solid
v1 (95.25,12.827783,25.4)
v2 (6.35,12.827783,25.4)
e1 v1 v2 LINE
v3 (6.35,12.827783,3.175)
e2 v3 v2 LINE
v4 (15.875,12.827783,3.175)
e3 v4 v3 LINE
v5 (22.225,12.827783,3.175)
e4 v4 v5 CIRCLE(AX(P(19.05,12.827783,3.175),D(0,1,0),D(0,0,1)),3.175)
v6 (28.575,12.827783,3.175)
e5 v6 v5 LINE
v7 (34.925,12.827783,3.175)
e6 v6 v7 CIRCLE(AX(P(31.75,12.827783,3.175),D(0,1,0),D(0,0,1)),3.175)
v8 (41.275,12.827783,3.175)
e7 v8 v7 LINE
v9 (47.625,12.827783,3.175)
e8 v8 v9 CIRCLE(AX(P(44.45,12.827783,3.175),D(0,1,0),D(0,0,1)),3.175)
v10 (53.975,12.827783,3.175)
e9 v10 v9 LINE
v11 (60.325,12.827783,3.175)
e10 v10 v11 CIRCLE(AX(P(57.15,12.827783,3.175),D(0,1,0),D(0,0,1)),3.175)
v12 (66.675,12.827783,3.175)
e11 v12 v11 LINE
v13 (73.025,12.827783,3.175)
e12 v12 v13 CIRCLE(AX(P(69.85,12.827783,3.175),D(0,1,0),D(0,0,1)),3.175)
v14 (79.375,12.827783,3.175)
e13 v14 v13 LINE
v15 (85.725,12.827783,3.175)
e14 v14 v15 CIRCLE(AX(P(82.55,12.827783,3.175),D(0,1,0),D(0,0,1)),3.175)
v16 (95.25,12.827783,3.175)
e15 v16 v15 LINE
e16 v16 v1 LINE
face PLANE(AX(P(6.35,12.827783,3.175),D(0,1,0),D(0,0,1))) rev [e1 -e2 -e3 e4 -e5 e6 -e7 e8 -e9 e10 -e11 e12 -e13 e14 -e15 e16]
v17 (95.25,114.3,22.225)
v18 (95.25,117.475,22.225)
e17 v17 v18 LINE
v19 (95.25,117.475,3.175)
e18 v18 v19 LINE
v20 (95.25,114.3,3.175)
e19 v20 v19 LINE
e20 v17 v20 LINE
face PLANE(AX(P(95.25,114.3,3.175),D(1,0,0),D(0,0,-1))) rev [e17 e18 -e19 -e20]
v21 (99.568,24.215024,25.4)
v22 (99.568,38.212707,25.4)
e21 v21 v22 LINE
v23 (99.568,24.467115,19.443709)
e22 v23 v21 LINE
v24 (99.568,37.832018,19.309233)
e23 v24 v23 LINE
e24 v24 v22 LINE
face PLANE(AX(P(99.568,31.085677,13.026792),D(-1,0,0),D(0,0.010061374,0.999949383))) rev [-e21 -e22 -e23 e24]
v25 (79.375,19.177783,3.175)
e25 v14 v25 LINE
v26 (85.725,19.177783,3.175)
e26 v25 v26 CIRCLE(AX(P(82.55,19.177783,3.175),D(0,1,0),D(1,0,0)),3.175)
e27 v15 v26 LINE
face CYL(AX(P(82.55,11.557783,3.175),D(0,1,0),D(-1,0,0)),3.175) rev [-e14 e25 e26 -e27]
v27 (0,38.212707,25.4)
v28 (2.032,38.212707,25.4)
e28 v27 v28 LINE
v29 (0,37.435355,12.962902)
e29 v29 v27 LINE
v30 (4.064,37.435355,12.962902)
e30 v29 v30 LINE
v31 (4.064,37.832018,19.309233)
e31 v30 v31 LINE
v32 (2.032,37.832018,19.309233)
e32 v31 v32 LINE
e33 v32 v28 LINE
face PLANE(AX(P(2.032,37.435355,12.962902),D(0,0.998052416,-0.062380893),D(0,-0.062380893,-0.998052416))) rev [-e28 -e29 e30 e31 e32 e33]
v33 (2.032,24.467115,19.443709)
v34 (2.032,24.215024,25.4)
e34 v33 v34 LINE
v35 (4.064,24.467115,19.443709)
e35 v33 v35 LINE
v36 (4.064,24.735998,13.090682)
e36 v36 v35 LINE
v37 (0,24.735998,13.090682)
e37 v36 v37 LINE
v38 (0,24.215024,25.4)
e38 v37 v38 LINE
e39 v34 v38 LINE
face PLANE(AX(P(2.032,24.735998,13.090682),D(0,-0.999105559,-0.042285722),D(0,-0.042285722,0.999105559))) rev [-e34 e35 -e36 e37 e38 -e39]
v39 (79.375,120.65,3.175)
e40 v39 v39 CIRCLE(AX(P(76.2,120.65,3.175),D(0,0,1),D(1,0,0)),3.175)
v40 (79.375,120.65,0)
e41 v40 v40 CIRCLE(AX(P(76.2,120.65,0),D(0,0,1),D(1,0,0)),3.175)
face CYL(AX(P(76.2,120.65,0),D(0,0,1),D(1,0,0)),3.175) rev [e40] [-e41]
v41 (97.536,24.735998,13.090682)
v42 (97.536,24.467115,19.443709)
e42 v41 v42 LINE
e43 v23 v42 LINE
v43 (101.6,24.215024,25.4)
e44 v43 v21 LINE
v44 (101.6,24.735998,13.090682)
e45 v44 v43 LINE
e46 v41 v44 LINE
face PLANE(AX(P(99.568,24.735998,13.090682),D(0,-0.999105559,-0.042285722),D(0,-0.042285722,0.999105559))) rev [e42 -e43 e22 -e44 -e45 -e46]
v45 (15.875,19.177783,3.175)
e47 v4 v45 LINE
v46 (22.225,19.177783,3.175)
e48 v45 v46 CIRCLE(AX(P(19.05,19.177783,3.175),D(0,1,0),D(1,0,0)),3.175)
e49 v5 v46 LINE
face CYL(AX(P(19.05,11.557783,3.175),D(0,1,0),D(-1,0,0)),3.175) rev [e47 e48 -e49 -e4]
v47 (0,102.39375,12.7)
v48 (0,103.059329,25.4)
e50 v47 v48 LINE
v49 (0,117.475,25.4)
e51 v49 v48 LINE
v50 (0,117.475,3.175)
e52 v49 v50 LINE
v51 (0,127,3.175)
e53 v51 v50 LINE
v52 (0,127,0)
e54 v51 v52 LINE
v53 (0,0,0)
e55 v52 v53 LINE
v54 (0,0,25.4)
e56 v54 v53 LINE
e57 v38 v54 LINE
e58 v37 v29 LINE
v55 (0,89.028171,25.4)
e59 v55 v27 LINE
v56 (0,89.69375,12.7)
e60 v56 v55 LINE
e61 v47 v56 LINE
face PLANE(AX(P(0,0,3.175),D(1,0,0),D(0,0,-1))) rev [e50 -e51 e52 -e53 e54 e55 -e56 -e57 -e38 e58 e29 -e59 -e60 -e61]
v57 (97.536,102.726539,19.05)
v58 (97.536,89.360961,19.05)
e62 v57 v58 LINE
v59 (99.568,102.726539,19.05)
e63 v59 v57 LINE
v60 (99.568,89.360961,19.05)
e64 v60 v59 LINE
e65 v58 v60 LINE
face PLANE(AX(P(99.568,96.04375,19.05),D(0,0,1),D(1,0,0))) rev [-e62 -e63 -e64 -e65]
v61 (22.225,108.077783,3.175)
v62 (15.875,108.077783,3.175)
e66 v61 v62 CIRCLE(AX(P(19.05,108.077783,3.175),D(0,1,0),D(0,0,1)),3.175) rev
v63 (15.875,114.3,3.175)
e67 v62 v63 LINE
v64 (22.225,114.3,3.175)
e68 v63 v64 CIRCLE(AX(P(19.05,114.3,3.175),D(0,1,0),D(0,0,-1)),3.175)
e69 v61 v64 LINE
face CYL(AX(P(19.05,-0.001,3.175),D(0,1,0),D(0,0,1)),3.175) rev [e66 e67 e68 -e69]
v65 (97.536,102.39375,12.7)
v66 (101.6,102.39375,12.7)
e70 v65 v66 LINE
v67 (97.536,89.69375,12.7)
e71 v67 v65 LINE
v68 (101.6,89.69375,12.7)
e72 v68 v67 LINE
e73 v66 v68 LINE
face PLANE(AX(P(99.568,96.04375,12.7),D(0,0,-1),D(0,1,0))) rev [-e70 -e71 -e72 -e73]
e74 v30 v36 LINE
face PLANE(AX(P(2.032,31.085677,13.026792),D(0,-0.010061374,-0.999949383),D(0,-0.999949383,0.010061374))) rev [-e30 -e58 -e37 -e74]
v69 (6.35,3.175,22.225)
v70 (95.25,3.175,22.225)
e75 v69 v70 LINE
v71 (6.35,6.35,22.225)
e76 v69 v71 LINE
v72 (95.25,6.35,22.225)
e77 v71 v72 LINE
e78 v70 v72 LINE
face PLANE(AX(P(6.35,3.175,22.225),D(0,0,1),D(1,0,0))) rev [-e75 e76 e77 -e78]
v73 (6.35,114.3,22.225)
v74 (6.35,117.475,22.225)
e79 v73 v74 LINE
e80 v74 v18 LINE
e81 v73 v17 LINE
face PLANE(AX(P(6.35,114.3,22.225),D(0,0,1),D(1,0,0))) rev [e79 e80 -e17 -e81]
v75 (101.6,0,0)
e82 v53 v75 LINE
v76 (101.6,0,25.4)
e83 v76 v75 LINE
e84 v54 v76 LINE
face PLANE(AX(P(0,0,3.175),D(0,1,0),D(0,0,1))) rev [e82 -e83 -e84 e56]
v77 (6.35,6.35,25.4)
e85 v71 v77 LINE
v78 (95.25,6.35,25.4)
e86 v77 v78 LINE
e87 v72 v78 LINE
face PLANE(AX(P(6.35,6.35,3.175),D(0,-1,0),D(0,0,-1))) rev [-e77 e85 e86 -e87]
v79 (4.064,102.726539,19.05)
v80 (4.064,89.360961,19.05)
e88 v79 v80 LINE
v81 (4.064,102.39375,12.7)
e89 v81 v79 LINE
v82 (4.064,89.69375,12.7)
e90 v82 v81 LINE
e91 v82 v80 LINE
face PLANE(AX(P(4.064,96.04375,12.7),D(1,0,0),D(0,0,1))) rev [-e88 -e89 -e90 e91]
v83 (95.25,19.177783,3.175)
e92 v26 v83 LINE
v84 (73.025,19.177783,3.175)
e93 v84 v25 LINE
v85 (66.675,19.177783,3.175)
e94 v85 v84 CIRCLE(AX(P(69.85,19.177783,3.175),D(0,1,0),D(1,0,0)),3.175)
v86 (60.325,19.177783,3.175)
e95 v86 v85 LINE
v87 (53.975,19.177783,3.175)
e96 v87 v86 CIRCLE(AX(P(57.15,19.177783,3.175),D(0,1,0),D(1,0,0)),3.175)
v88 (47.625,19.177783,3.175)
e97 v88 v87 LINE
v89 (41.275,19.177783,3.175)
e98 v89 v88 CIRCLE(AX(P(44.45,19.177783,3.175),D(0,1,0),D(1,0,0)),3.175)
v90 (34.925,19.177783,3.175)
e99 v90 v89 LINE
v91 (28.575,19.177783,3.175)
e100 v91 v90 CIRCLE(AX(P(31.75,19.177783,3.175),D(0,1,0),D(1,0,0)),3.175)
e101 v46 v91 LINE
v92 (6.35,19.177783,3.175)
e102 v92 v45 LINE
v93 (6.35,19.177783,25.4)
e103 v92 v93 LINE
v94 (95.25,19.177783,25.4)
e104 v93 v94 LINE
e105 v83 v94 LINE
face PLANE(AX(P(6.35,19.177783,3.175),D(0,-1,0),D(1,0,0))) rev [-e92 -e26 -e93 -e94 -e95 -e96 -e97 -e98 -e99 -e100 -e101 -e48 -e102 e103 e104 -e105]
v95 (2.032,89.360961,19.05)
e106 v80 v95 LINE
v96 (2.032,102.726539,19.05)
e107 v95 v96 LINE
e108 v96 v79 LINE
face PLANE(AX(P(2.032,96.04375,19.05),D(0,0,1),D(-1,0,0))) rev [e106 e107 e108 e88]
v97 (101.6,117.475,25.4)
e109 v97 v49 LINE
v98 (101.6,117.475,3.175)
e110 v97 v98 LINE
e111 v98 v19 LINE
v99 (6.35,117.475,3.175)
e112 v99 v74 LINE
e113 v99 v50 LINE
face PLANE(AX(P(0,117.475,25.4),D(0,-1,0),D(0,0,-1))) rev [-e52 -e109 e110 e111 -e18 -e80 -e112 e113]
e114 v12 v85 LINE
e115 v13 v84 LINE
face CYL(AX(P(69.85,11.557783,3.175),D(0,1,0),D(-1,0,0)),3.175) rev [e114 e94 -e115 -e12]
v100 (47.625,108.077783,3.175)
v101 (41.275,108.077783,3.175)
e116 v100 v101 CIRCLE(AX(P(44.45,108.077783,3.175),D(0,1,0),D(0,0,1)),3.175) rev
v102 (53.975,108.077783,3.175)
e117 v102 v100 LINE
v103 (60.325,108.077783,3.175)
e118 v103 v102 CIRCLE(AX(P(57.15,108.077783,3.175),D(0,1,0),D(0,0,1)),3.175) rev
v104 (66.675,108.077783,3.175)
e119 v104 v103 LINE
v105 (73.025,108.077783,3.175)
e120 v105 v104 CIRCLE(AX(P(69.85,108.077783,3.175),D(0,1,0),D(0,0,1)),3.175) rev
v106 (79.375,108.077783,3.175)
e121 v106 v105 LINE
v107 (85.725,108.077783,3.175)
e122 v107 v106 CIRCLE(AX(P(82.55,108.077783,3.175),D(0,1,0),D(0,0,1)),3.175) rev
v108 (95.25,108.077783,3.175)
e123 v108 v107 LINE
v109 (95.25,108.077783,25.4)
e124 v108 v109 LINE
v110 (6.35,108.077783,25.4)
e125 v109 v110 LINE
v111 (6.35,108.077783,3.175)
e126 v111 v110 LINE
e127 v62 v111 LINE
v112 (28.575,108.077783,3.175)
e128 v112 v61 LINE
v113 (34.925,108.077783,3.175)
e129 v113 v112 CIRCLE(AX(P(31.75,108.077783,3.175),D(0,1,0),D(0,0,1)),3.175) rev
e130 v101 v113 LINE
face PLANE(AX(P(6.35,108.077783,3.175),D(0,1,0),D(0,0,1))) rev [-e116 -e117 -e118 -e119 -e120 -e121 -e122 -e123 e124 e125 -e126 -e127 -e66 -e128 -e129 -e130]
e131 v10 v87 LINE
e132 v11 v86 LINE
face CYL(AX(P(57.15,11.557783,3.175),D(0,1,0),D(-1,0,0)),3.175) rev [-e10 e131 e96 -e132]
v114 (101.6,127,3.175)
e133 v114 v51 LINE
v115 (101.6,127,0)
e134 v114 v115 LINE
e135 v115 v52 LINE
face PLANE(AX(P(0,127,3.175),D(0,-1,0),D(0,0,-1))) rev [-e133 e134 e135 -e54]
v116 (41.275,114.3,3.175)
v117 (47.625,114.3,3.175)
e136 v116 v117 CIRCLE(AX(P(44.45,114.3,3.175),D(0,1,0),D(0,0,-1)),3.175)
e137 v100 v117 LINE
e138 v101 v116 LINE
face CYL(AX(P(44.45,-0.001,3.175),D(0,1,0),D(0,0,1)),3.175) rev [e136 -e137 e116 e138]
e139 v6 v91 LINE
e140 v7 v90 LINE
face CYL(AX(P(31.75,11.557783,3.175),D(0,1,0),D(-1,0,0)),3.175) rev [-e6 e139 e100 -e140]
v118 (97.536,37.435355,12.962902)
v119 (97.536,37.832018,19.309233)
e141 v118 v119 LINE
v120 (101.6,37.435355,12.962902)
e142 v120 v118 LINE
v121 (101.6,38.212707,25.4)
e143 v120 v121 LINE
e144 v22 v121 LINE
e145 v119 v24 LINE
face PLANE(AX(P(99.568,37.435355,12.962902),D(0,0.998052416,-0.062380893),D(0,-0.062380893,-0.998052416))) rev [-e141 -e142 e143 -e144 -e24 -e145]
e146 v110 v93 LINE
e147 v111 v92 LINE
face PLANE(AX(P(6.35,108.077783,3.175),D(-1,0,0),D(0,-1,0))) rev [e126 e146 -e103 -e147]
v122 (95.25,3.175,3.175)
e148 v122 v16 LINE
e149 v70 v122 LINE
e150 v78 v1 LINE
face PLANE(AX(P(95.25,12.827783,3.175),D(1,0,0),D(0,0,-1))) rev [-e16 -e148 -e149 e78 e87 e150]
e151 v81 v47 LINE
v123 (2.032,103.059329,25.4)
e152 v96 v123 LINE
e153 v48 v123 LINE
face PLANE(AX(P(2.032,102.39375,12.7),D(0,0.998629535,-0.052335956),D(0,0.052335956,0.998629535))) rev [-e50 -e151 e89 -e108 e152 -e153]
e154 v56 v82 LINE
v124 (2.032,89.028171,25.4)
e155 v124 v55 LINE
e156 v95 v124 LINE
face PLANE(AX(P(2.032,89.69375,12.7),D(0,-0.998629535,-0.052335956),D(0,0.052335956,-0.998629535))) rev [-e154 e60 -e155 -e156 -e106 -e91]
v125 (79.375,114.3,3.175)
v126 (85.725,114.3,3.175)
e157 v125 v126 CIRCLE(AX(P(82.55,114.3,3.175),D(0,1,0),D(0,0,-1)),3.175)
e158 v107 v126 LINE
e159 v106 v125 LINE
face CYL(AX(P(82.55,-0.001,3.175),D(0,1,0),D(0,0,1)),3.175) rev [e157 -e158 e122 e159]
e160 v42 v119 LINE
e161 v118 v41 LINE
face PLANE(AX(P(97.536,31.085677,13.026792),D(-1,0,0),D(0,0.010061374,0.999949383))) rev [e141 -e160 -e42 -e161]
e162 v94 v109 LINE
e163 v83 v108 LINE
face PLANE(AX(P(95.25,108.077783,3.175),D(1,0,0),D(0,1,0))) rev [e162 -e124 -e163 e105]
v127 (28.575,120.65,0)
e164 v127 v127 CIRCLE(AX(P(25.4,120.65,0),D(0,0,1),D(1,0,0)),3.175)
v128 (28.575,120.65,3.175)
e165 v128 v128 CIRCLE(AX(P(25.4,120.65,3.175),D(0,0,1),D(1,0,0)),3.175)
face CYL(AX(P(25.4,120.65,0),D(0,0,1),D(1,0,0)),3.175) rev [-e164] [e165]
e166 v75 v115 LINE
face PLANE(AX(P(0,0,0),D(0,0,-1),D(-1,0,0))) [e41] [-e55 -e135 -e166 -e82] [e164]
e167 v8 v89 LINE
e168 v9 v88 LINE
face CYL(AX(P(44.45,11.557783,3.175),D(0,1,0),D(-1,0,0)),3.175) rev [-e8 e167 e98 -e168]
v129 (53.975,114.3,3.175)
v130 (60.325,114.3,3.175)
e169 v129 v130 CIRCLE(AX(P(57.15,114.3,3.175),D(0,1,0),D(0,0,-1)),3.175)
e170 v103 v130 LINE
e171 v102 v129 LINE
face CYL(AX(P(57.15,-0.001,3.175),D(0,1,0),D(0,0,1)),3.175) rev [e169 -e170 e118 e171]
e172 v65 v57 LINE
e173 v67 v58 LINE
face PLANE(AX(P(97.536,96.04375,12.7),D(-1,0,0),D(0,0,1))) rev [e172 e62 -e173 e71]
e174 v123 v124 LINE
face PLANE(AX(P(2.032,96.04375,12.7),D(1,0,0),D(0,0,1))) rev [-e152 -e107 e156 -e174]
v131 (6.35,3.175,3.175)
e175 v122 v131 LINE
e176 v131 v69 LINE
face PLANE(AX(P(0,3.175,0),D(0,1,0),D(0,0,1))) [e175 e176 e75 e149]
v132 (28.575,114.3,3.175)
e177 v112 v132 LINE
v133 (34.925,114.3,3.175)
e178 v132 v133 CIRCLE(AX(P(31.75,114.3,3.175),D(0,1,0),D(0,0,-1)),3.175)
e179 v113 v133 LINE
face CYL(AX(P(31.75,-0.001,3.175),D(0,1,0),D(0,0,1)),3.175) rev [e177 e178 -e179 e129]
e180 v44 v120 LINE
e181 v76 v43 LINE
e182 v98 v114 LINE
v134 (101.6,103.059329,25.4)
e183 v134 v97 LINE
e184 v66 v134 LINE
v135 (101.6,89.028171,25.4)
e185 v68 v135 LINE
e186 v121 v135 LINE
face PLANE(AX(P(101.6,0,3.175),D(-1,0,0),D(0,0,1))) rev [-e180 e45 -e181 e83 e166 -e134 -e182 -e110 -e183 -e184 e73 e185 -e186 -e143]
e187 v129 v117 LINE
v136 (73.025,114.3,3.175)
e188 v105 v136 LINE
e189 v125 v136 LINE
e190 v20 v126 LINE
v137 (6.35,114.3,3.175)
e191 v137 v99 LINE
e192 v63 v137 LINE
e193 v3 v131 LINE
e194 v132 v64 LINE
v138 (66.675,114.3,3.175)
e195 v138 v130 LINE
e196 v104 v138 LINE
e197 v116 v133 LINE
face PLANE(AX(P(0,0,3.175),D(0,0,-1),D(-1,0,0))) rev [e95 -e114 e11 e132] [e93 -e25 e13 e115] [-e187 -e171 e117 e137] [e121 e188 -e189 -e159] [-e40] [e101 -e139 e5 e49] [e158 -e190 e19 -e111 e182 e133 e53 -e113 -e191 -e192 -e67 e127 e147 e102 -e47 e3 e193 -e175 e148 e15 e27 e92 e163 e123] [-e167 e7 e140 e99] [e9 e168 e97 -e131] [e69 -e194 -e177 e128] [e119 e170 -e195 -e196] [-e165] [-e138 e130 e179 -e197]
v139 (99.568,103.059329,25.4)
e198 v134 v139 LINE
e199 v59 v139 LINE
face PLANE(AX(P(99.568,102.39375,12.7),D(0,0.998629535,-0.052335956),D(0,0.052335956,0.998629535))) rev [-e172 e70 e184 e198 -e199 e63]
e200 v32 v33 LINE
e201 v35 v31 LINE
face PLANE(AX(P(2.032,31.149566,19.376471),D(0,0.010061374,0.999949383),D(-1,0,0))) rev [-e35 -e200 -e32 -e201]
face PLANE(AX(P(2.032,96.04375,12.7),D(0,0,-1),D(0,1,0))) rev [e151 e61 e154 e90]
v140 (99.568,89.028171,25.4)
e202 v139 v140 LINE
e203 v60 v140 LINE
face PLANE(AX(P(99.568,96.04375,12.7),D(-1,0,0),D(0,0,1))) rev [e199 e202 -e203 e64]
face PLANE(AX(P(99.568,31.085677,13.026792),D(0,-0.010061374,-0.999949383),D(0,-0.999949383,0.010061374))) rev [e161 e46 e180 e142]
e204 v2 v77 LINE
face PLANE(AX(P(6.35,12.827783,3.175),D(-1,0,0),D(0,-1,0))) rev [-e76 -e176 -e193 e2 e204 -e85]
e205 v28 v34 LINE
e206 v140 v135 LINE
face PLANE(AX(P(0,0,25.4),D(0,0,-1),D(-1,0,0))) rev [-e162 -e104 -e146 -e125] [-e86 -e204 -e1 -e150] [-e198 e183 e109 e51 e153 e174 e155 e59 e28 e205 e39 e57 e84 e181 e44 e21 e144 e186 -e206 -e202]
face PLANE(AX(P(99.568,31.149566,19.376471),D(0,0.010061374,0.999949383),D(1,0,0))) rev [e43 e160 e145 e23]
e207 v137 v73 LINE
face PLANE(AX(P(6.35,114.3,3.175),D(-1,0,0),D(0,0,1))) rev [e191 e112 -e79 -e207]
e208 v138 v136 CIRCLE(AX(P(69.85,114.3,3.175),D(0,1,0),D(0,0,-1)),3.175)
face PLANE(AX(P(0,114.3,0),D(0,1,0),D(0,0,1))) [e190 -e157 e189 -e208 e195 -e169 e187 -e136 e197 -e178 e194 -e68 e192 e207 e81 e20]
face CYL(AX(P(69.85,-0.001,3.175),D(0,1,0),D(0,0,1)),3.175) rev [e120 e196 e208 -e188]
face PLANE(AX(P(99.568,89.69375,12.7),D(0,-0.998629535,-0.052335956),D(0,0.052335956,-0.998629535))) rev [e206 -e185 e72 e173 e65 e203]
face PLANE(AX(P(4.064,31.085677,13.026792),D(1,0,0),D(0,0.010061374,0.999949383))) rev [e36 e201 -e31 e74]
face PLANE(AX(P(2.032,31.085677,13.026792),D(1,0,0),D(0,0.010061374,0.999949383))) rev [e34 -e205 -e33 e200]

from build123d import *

# Parameters (mm, degrees)
SKETCH1_W            = 101.6
SKETCH1_H            = 127
BOSS_EXTRUDE1_DEPTH  = 3.175
SKETCH2_W            = 101.6
SKETCH2_H            = 117.475
BOSS_EXTRUDE2_DEPTH  = 22.225
SKETCH3_W            = 88.9
SKETCH3_H            = 19.05
CUT_EXTRUDE1_DEPTH   = 3.175
SKETCH4_R            = 3.175
CUT_EXTRUDE2_DEPTH   = 165.150877625
SKETCH5_W            = 88.9
SKETCH5_H            = 6.477782688
CUT_EXTRUDE3_DEPTH   = 22.225
SKETCH6_W            = 88.9
SKETCH6_H            = 19.05
CUT_EXTRUDE4_DEPTH   = 3.175
SKETCH7_W            = 88.9
SKETCH7_H            = 88.9
CUT_EXTRUDE6_DEPTH   = 22.225
CUT_EXTRUDE7_DEPTH   = 7.62
LPATTERN1_COUNT      = 6
LPATTERN1_PITCH      = 12.7
SNAP_START           = 99.568
SNAP_GROOVE1_DEPTH   = 2.032
SNAP_START_2         = 97.536
SNAP_GROOVE1_2_DEPTH = 2.032
MIRROR2_START        = 99.568
MIRROR2_COPY_1_DEPTH = 2.032
MIRROR2_START_2      = 97.536
MIRROR2_COPY_2_DEPTH = 2.032
MIRROR2_COPY_3_DEPTH = 2.032
CUT_EXTRUDE8_REACH   = 157.023
LPATTERN2_COUNT      = 6
LPATTERN2_PITCH      = 12.7


# Read off the part's stored shape, not the designer's step: Snap Groove1
with BuildPart() as part:
    # Sketch1 → Boss-Extrude1 (new body)
    with BuildSketch(Plane.XY):
        with Locations((50.8, 63.5)):
            Rectangle(SKETCH1_W, SKETCH1_H)
    extrude(amount=BOSS_EXTRUDE1_DEPTH)

    # Sketch2 → Boss-Extrude2 (add)
    with BuildSketch(Plane.XY.offset(3.175)):
        with Locations((50.8, 58.7375)):
            Rectangle(SKETCH2_W, SKETCH2_H)
    extrude(amount=BOSS_EXTRUDE2_DEPTH)

    # Sketch3 → Cut-Extrude1 (cut)
    with BuildSketch(Plane(origin=(0, 117.475, 0), x_dir=(1, 0, 0), z_dir=(0, 1, 0))):
        with Locations((50.8, -12.7)):
            Rectangle(SKETCH3_W, SKETCH3_H)
    extrude(amount=-CUT_EXTRUDE1_DEPTH, mode=Mode.SUBTRACT)

    # Sketch4 → Cut-Extrude2 (cut, through all)
    with BuildSketch(Plane.XY.offset(3.175)):
        with Locations((25.4, 120.65)):
            Circle(SKETCH4_R)
        with Locations((76.2, 120.65)):
            Circle(SKETCH4_R)
    extrude(amount=-CUT_EXTRUDE2_DEPTH, mode=Mode.SUBTRACT)

    # Sketch5 → Cut-Extrude3 (cut)
    with BuildSketch(Plane.XY.offset(25.4)):
        with Locations((50.8, 9.588891344)):
            Rectangle(SKETCH5_W, SKETCH5_H)
    extrude(amount=-CUT_EXTRUDE3_DEPTH, mode=Mode.SUBTRACT)

    # Sketch6 → Cut-Extrude4 (cut)
    with BuildSketch(Plane(origin=(0, 6.35, 0), x_dir=(1, 0, 0), z_dir=(0, 1, 0))):
        with Locations((50.8, -12.7)):
            Rectangle(SKETCH6_W, SKETCH6_H)
    extrude(amount=-CUT_EXTRUDE4_DEPTH, mode=Mode.SUBTRACT)

    # Sketch7 → Cut-Extrude6 (cut)
    with BuildSketch(Plane.XY.offset(25.4)):
        with Locations((50.8, 63.627782688)):
            Rectangle(SKETCH7_W, SKETCH7_H)
    extrude(amount=-CUT_EXTRUDE6_DEPTH, mode=Mode.SUBTRACT)

    # Sketch9 → Cut-Extrude7 (cut)
    with BuildSketch(Plane(origin=(0, 19.177782688, 0), x_dir=(1, 0, 0), z_dir=(0, 1, 0))):
        with BuildLine():
            Line((15.875, -3.175), (22.225, -3.175))
            ThreePointArc((22.225, -3.175), (19.05, -6.35), (15.875, -3.175))
        make_face()
    cut_extrude7 = extrude(amount=-CUT_EXTRUDE7_DEPTH, mode=Mode.SUBTRACT)

    # LPattern1: Cut-Extrude7 ×6
    with Locations(*[(i * LPATTERN1_PITCH, 0, 0) for i in range(1, LPATTERN1_COUNT)]):
        add(cut_extrude7, mode=Mode.SUBTRACT)

    # Snap Groove1 outline → Snap Groove1 (cut)
    with BuildSketch(Plane.YZ.offset(SNAP_START)):
        Polygon((102.39375, 12.7), (103.059328797, 25.4), (89.028171203, 25.4), (89.69375, 12.7), align=None)
    snap_groove1 = extrude(amount=SNAP_GROOVE1_DEPTH, mode=Mode.SUBTRACT)

    # Snap Groove1 2 outline → Snap Groove1 2 (cut)
    with BuildSketch(Plane.YZ.offset(SNAP_START_2)):
        Polygon((102.39375, 12.7), (102.726539398, 19.05), (89.360960602, 19.05), (89.69375, 12.7), align=None)
    snap_groove1_2 = extrude(amount=SNAP_GROOVE1_2_DEPTH, mode=Mode.SUBTRACT)

    # Mirror1: Snap Groove1, Snap Groove1 2 across plane
    add(snap_groove1.mirror(Plane(origin=(50.8, 0, 0), x_dir=(0, 0, 1), z_dir=(1, 0, 0))), mode=Mode.SUBTRACT)
    add(snap_groove1_2.mirror(Plane(origin=(50.8, 0, 0), x_dir=(0, 0, 1), z_dir=(1, 0, 0))), mode=Mode.SUBTRACT)

    # Mirror2: Snap Groove1, Snap Groove1 2 across plane
    add(snap_groove1.mirror(Plane(origin=(0, 63.498392913, -0.319448634), x_dir=(0, 0.005030750815786494, 0.999987345693049), z_dir=(0, -0.9999873456930491, 0.0050307508157864935))), mode=Mode.SUBTRACT)
    add(snap_groove1_2.mirror(Plane(origin=(0, 63.498392913, -0.319448634), x_dir=(0, 0.005030750815786494, 0.999987345693049), z_dir=(0, -0.9999873456930491, 0.0050307508157864935))), mode=Mode.SUBTRACT)

    # Mirror2 copy 1 sketch → Mirror2 copy 1 (cut)
    with BuildSketch(Plane(origin=(101.6, 126.996785826, -0.638897269), x_dir=(0, -0.9999493830924595, 0.010061374310242954), z_dir=(-1, 0, 0)).offset(MIRROR2_START)):
        Polygon((102.39375, 12.7), (103.059328797, 25.4), (89.028171203, 25.4), (89.69375, 12.7), align=None)
    extrude(amount=MIRROR2_COPY_1_DEPTH, mode=Mode.SUBTRACT)

    # Mirror2 copy 2 sketch → Mirror2 copy 2 (cut)
    with BuildSketch(Plane(origin=(101.6, 126.996785826, -0.638897269), x_dir=(0, -0.9999493830924595, 0.010061374310242954), z_dir=(-1, 0, 0)).offset(MIRROR2_START_2)):
        Polygon((102.39375, 12.7), (102.726539398, 19.05), (89.360960602, 19.05), (89.69375, 12.7), align=None)
    extrude(amount=MIRROR2_COPY_2_DEPTH, mode=Mode.SUBTRACT)

    # Mirror2 copy 3 sketch → Mirror2 copy 3 (cut)
    with BuildSketch(Plane(origin=(0, 126.996785826, -0.638897269), x_dir=(0, -0.9999493830924595, 0.010061374310242954), z_dir=(1, 0, 0)).offset(MIRROR2_START_2)):
        Polygon((102.39375, -12.7), (102.726539398, -19.05), (89.360960602, -19.05), (89.69375, -12.7), align=None)
    extrude(amount=MIRROR2_COPY_3_DEPTH, mode=Mode.SUBTRACT)

    # Sketch11 → Cut-Extrude8 (cut, up to next)
    with BuildSketch(Plane(origin=(0, 114.3, 0), x_dir=(1, 0, 0), z_dir=(0, 1, 0)), mode=Mode.PRIVATE) as cut_extrude8_sk1:
        with BuildLine():
            Line((15.875, -3.175), (22.225, -3.175))
            ThreePointArc((22.225, -3.175), (19.05, -6.35), (15.875, -3.175))
        make_face()
    cut_extrude8_tool1 = extrude(cut_extrude8_sk1.sketch, amount=-CUT_EXTRUDE8_REACH, mode=Mode.PRIVATE) & part.part
    cut_extrude8 = cut_extrude8_tool1.solids().sort_by_distance((19.05, 114.3, 4.522512))[0]
    add(cut_extrude8, mode=Mode.SUBTRACT)

    # LPattern2: Cut-Extrude8 ×6
    with Locations(*[(i * LPATTERN2_PITCH, 0, 0) for i in range(1, LPATTERN2_COUNT)]):
        add(cut_extrude8, mode=Mode.SUBTRACT)


solid = part.part
